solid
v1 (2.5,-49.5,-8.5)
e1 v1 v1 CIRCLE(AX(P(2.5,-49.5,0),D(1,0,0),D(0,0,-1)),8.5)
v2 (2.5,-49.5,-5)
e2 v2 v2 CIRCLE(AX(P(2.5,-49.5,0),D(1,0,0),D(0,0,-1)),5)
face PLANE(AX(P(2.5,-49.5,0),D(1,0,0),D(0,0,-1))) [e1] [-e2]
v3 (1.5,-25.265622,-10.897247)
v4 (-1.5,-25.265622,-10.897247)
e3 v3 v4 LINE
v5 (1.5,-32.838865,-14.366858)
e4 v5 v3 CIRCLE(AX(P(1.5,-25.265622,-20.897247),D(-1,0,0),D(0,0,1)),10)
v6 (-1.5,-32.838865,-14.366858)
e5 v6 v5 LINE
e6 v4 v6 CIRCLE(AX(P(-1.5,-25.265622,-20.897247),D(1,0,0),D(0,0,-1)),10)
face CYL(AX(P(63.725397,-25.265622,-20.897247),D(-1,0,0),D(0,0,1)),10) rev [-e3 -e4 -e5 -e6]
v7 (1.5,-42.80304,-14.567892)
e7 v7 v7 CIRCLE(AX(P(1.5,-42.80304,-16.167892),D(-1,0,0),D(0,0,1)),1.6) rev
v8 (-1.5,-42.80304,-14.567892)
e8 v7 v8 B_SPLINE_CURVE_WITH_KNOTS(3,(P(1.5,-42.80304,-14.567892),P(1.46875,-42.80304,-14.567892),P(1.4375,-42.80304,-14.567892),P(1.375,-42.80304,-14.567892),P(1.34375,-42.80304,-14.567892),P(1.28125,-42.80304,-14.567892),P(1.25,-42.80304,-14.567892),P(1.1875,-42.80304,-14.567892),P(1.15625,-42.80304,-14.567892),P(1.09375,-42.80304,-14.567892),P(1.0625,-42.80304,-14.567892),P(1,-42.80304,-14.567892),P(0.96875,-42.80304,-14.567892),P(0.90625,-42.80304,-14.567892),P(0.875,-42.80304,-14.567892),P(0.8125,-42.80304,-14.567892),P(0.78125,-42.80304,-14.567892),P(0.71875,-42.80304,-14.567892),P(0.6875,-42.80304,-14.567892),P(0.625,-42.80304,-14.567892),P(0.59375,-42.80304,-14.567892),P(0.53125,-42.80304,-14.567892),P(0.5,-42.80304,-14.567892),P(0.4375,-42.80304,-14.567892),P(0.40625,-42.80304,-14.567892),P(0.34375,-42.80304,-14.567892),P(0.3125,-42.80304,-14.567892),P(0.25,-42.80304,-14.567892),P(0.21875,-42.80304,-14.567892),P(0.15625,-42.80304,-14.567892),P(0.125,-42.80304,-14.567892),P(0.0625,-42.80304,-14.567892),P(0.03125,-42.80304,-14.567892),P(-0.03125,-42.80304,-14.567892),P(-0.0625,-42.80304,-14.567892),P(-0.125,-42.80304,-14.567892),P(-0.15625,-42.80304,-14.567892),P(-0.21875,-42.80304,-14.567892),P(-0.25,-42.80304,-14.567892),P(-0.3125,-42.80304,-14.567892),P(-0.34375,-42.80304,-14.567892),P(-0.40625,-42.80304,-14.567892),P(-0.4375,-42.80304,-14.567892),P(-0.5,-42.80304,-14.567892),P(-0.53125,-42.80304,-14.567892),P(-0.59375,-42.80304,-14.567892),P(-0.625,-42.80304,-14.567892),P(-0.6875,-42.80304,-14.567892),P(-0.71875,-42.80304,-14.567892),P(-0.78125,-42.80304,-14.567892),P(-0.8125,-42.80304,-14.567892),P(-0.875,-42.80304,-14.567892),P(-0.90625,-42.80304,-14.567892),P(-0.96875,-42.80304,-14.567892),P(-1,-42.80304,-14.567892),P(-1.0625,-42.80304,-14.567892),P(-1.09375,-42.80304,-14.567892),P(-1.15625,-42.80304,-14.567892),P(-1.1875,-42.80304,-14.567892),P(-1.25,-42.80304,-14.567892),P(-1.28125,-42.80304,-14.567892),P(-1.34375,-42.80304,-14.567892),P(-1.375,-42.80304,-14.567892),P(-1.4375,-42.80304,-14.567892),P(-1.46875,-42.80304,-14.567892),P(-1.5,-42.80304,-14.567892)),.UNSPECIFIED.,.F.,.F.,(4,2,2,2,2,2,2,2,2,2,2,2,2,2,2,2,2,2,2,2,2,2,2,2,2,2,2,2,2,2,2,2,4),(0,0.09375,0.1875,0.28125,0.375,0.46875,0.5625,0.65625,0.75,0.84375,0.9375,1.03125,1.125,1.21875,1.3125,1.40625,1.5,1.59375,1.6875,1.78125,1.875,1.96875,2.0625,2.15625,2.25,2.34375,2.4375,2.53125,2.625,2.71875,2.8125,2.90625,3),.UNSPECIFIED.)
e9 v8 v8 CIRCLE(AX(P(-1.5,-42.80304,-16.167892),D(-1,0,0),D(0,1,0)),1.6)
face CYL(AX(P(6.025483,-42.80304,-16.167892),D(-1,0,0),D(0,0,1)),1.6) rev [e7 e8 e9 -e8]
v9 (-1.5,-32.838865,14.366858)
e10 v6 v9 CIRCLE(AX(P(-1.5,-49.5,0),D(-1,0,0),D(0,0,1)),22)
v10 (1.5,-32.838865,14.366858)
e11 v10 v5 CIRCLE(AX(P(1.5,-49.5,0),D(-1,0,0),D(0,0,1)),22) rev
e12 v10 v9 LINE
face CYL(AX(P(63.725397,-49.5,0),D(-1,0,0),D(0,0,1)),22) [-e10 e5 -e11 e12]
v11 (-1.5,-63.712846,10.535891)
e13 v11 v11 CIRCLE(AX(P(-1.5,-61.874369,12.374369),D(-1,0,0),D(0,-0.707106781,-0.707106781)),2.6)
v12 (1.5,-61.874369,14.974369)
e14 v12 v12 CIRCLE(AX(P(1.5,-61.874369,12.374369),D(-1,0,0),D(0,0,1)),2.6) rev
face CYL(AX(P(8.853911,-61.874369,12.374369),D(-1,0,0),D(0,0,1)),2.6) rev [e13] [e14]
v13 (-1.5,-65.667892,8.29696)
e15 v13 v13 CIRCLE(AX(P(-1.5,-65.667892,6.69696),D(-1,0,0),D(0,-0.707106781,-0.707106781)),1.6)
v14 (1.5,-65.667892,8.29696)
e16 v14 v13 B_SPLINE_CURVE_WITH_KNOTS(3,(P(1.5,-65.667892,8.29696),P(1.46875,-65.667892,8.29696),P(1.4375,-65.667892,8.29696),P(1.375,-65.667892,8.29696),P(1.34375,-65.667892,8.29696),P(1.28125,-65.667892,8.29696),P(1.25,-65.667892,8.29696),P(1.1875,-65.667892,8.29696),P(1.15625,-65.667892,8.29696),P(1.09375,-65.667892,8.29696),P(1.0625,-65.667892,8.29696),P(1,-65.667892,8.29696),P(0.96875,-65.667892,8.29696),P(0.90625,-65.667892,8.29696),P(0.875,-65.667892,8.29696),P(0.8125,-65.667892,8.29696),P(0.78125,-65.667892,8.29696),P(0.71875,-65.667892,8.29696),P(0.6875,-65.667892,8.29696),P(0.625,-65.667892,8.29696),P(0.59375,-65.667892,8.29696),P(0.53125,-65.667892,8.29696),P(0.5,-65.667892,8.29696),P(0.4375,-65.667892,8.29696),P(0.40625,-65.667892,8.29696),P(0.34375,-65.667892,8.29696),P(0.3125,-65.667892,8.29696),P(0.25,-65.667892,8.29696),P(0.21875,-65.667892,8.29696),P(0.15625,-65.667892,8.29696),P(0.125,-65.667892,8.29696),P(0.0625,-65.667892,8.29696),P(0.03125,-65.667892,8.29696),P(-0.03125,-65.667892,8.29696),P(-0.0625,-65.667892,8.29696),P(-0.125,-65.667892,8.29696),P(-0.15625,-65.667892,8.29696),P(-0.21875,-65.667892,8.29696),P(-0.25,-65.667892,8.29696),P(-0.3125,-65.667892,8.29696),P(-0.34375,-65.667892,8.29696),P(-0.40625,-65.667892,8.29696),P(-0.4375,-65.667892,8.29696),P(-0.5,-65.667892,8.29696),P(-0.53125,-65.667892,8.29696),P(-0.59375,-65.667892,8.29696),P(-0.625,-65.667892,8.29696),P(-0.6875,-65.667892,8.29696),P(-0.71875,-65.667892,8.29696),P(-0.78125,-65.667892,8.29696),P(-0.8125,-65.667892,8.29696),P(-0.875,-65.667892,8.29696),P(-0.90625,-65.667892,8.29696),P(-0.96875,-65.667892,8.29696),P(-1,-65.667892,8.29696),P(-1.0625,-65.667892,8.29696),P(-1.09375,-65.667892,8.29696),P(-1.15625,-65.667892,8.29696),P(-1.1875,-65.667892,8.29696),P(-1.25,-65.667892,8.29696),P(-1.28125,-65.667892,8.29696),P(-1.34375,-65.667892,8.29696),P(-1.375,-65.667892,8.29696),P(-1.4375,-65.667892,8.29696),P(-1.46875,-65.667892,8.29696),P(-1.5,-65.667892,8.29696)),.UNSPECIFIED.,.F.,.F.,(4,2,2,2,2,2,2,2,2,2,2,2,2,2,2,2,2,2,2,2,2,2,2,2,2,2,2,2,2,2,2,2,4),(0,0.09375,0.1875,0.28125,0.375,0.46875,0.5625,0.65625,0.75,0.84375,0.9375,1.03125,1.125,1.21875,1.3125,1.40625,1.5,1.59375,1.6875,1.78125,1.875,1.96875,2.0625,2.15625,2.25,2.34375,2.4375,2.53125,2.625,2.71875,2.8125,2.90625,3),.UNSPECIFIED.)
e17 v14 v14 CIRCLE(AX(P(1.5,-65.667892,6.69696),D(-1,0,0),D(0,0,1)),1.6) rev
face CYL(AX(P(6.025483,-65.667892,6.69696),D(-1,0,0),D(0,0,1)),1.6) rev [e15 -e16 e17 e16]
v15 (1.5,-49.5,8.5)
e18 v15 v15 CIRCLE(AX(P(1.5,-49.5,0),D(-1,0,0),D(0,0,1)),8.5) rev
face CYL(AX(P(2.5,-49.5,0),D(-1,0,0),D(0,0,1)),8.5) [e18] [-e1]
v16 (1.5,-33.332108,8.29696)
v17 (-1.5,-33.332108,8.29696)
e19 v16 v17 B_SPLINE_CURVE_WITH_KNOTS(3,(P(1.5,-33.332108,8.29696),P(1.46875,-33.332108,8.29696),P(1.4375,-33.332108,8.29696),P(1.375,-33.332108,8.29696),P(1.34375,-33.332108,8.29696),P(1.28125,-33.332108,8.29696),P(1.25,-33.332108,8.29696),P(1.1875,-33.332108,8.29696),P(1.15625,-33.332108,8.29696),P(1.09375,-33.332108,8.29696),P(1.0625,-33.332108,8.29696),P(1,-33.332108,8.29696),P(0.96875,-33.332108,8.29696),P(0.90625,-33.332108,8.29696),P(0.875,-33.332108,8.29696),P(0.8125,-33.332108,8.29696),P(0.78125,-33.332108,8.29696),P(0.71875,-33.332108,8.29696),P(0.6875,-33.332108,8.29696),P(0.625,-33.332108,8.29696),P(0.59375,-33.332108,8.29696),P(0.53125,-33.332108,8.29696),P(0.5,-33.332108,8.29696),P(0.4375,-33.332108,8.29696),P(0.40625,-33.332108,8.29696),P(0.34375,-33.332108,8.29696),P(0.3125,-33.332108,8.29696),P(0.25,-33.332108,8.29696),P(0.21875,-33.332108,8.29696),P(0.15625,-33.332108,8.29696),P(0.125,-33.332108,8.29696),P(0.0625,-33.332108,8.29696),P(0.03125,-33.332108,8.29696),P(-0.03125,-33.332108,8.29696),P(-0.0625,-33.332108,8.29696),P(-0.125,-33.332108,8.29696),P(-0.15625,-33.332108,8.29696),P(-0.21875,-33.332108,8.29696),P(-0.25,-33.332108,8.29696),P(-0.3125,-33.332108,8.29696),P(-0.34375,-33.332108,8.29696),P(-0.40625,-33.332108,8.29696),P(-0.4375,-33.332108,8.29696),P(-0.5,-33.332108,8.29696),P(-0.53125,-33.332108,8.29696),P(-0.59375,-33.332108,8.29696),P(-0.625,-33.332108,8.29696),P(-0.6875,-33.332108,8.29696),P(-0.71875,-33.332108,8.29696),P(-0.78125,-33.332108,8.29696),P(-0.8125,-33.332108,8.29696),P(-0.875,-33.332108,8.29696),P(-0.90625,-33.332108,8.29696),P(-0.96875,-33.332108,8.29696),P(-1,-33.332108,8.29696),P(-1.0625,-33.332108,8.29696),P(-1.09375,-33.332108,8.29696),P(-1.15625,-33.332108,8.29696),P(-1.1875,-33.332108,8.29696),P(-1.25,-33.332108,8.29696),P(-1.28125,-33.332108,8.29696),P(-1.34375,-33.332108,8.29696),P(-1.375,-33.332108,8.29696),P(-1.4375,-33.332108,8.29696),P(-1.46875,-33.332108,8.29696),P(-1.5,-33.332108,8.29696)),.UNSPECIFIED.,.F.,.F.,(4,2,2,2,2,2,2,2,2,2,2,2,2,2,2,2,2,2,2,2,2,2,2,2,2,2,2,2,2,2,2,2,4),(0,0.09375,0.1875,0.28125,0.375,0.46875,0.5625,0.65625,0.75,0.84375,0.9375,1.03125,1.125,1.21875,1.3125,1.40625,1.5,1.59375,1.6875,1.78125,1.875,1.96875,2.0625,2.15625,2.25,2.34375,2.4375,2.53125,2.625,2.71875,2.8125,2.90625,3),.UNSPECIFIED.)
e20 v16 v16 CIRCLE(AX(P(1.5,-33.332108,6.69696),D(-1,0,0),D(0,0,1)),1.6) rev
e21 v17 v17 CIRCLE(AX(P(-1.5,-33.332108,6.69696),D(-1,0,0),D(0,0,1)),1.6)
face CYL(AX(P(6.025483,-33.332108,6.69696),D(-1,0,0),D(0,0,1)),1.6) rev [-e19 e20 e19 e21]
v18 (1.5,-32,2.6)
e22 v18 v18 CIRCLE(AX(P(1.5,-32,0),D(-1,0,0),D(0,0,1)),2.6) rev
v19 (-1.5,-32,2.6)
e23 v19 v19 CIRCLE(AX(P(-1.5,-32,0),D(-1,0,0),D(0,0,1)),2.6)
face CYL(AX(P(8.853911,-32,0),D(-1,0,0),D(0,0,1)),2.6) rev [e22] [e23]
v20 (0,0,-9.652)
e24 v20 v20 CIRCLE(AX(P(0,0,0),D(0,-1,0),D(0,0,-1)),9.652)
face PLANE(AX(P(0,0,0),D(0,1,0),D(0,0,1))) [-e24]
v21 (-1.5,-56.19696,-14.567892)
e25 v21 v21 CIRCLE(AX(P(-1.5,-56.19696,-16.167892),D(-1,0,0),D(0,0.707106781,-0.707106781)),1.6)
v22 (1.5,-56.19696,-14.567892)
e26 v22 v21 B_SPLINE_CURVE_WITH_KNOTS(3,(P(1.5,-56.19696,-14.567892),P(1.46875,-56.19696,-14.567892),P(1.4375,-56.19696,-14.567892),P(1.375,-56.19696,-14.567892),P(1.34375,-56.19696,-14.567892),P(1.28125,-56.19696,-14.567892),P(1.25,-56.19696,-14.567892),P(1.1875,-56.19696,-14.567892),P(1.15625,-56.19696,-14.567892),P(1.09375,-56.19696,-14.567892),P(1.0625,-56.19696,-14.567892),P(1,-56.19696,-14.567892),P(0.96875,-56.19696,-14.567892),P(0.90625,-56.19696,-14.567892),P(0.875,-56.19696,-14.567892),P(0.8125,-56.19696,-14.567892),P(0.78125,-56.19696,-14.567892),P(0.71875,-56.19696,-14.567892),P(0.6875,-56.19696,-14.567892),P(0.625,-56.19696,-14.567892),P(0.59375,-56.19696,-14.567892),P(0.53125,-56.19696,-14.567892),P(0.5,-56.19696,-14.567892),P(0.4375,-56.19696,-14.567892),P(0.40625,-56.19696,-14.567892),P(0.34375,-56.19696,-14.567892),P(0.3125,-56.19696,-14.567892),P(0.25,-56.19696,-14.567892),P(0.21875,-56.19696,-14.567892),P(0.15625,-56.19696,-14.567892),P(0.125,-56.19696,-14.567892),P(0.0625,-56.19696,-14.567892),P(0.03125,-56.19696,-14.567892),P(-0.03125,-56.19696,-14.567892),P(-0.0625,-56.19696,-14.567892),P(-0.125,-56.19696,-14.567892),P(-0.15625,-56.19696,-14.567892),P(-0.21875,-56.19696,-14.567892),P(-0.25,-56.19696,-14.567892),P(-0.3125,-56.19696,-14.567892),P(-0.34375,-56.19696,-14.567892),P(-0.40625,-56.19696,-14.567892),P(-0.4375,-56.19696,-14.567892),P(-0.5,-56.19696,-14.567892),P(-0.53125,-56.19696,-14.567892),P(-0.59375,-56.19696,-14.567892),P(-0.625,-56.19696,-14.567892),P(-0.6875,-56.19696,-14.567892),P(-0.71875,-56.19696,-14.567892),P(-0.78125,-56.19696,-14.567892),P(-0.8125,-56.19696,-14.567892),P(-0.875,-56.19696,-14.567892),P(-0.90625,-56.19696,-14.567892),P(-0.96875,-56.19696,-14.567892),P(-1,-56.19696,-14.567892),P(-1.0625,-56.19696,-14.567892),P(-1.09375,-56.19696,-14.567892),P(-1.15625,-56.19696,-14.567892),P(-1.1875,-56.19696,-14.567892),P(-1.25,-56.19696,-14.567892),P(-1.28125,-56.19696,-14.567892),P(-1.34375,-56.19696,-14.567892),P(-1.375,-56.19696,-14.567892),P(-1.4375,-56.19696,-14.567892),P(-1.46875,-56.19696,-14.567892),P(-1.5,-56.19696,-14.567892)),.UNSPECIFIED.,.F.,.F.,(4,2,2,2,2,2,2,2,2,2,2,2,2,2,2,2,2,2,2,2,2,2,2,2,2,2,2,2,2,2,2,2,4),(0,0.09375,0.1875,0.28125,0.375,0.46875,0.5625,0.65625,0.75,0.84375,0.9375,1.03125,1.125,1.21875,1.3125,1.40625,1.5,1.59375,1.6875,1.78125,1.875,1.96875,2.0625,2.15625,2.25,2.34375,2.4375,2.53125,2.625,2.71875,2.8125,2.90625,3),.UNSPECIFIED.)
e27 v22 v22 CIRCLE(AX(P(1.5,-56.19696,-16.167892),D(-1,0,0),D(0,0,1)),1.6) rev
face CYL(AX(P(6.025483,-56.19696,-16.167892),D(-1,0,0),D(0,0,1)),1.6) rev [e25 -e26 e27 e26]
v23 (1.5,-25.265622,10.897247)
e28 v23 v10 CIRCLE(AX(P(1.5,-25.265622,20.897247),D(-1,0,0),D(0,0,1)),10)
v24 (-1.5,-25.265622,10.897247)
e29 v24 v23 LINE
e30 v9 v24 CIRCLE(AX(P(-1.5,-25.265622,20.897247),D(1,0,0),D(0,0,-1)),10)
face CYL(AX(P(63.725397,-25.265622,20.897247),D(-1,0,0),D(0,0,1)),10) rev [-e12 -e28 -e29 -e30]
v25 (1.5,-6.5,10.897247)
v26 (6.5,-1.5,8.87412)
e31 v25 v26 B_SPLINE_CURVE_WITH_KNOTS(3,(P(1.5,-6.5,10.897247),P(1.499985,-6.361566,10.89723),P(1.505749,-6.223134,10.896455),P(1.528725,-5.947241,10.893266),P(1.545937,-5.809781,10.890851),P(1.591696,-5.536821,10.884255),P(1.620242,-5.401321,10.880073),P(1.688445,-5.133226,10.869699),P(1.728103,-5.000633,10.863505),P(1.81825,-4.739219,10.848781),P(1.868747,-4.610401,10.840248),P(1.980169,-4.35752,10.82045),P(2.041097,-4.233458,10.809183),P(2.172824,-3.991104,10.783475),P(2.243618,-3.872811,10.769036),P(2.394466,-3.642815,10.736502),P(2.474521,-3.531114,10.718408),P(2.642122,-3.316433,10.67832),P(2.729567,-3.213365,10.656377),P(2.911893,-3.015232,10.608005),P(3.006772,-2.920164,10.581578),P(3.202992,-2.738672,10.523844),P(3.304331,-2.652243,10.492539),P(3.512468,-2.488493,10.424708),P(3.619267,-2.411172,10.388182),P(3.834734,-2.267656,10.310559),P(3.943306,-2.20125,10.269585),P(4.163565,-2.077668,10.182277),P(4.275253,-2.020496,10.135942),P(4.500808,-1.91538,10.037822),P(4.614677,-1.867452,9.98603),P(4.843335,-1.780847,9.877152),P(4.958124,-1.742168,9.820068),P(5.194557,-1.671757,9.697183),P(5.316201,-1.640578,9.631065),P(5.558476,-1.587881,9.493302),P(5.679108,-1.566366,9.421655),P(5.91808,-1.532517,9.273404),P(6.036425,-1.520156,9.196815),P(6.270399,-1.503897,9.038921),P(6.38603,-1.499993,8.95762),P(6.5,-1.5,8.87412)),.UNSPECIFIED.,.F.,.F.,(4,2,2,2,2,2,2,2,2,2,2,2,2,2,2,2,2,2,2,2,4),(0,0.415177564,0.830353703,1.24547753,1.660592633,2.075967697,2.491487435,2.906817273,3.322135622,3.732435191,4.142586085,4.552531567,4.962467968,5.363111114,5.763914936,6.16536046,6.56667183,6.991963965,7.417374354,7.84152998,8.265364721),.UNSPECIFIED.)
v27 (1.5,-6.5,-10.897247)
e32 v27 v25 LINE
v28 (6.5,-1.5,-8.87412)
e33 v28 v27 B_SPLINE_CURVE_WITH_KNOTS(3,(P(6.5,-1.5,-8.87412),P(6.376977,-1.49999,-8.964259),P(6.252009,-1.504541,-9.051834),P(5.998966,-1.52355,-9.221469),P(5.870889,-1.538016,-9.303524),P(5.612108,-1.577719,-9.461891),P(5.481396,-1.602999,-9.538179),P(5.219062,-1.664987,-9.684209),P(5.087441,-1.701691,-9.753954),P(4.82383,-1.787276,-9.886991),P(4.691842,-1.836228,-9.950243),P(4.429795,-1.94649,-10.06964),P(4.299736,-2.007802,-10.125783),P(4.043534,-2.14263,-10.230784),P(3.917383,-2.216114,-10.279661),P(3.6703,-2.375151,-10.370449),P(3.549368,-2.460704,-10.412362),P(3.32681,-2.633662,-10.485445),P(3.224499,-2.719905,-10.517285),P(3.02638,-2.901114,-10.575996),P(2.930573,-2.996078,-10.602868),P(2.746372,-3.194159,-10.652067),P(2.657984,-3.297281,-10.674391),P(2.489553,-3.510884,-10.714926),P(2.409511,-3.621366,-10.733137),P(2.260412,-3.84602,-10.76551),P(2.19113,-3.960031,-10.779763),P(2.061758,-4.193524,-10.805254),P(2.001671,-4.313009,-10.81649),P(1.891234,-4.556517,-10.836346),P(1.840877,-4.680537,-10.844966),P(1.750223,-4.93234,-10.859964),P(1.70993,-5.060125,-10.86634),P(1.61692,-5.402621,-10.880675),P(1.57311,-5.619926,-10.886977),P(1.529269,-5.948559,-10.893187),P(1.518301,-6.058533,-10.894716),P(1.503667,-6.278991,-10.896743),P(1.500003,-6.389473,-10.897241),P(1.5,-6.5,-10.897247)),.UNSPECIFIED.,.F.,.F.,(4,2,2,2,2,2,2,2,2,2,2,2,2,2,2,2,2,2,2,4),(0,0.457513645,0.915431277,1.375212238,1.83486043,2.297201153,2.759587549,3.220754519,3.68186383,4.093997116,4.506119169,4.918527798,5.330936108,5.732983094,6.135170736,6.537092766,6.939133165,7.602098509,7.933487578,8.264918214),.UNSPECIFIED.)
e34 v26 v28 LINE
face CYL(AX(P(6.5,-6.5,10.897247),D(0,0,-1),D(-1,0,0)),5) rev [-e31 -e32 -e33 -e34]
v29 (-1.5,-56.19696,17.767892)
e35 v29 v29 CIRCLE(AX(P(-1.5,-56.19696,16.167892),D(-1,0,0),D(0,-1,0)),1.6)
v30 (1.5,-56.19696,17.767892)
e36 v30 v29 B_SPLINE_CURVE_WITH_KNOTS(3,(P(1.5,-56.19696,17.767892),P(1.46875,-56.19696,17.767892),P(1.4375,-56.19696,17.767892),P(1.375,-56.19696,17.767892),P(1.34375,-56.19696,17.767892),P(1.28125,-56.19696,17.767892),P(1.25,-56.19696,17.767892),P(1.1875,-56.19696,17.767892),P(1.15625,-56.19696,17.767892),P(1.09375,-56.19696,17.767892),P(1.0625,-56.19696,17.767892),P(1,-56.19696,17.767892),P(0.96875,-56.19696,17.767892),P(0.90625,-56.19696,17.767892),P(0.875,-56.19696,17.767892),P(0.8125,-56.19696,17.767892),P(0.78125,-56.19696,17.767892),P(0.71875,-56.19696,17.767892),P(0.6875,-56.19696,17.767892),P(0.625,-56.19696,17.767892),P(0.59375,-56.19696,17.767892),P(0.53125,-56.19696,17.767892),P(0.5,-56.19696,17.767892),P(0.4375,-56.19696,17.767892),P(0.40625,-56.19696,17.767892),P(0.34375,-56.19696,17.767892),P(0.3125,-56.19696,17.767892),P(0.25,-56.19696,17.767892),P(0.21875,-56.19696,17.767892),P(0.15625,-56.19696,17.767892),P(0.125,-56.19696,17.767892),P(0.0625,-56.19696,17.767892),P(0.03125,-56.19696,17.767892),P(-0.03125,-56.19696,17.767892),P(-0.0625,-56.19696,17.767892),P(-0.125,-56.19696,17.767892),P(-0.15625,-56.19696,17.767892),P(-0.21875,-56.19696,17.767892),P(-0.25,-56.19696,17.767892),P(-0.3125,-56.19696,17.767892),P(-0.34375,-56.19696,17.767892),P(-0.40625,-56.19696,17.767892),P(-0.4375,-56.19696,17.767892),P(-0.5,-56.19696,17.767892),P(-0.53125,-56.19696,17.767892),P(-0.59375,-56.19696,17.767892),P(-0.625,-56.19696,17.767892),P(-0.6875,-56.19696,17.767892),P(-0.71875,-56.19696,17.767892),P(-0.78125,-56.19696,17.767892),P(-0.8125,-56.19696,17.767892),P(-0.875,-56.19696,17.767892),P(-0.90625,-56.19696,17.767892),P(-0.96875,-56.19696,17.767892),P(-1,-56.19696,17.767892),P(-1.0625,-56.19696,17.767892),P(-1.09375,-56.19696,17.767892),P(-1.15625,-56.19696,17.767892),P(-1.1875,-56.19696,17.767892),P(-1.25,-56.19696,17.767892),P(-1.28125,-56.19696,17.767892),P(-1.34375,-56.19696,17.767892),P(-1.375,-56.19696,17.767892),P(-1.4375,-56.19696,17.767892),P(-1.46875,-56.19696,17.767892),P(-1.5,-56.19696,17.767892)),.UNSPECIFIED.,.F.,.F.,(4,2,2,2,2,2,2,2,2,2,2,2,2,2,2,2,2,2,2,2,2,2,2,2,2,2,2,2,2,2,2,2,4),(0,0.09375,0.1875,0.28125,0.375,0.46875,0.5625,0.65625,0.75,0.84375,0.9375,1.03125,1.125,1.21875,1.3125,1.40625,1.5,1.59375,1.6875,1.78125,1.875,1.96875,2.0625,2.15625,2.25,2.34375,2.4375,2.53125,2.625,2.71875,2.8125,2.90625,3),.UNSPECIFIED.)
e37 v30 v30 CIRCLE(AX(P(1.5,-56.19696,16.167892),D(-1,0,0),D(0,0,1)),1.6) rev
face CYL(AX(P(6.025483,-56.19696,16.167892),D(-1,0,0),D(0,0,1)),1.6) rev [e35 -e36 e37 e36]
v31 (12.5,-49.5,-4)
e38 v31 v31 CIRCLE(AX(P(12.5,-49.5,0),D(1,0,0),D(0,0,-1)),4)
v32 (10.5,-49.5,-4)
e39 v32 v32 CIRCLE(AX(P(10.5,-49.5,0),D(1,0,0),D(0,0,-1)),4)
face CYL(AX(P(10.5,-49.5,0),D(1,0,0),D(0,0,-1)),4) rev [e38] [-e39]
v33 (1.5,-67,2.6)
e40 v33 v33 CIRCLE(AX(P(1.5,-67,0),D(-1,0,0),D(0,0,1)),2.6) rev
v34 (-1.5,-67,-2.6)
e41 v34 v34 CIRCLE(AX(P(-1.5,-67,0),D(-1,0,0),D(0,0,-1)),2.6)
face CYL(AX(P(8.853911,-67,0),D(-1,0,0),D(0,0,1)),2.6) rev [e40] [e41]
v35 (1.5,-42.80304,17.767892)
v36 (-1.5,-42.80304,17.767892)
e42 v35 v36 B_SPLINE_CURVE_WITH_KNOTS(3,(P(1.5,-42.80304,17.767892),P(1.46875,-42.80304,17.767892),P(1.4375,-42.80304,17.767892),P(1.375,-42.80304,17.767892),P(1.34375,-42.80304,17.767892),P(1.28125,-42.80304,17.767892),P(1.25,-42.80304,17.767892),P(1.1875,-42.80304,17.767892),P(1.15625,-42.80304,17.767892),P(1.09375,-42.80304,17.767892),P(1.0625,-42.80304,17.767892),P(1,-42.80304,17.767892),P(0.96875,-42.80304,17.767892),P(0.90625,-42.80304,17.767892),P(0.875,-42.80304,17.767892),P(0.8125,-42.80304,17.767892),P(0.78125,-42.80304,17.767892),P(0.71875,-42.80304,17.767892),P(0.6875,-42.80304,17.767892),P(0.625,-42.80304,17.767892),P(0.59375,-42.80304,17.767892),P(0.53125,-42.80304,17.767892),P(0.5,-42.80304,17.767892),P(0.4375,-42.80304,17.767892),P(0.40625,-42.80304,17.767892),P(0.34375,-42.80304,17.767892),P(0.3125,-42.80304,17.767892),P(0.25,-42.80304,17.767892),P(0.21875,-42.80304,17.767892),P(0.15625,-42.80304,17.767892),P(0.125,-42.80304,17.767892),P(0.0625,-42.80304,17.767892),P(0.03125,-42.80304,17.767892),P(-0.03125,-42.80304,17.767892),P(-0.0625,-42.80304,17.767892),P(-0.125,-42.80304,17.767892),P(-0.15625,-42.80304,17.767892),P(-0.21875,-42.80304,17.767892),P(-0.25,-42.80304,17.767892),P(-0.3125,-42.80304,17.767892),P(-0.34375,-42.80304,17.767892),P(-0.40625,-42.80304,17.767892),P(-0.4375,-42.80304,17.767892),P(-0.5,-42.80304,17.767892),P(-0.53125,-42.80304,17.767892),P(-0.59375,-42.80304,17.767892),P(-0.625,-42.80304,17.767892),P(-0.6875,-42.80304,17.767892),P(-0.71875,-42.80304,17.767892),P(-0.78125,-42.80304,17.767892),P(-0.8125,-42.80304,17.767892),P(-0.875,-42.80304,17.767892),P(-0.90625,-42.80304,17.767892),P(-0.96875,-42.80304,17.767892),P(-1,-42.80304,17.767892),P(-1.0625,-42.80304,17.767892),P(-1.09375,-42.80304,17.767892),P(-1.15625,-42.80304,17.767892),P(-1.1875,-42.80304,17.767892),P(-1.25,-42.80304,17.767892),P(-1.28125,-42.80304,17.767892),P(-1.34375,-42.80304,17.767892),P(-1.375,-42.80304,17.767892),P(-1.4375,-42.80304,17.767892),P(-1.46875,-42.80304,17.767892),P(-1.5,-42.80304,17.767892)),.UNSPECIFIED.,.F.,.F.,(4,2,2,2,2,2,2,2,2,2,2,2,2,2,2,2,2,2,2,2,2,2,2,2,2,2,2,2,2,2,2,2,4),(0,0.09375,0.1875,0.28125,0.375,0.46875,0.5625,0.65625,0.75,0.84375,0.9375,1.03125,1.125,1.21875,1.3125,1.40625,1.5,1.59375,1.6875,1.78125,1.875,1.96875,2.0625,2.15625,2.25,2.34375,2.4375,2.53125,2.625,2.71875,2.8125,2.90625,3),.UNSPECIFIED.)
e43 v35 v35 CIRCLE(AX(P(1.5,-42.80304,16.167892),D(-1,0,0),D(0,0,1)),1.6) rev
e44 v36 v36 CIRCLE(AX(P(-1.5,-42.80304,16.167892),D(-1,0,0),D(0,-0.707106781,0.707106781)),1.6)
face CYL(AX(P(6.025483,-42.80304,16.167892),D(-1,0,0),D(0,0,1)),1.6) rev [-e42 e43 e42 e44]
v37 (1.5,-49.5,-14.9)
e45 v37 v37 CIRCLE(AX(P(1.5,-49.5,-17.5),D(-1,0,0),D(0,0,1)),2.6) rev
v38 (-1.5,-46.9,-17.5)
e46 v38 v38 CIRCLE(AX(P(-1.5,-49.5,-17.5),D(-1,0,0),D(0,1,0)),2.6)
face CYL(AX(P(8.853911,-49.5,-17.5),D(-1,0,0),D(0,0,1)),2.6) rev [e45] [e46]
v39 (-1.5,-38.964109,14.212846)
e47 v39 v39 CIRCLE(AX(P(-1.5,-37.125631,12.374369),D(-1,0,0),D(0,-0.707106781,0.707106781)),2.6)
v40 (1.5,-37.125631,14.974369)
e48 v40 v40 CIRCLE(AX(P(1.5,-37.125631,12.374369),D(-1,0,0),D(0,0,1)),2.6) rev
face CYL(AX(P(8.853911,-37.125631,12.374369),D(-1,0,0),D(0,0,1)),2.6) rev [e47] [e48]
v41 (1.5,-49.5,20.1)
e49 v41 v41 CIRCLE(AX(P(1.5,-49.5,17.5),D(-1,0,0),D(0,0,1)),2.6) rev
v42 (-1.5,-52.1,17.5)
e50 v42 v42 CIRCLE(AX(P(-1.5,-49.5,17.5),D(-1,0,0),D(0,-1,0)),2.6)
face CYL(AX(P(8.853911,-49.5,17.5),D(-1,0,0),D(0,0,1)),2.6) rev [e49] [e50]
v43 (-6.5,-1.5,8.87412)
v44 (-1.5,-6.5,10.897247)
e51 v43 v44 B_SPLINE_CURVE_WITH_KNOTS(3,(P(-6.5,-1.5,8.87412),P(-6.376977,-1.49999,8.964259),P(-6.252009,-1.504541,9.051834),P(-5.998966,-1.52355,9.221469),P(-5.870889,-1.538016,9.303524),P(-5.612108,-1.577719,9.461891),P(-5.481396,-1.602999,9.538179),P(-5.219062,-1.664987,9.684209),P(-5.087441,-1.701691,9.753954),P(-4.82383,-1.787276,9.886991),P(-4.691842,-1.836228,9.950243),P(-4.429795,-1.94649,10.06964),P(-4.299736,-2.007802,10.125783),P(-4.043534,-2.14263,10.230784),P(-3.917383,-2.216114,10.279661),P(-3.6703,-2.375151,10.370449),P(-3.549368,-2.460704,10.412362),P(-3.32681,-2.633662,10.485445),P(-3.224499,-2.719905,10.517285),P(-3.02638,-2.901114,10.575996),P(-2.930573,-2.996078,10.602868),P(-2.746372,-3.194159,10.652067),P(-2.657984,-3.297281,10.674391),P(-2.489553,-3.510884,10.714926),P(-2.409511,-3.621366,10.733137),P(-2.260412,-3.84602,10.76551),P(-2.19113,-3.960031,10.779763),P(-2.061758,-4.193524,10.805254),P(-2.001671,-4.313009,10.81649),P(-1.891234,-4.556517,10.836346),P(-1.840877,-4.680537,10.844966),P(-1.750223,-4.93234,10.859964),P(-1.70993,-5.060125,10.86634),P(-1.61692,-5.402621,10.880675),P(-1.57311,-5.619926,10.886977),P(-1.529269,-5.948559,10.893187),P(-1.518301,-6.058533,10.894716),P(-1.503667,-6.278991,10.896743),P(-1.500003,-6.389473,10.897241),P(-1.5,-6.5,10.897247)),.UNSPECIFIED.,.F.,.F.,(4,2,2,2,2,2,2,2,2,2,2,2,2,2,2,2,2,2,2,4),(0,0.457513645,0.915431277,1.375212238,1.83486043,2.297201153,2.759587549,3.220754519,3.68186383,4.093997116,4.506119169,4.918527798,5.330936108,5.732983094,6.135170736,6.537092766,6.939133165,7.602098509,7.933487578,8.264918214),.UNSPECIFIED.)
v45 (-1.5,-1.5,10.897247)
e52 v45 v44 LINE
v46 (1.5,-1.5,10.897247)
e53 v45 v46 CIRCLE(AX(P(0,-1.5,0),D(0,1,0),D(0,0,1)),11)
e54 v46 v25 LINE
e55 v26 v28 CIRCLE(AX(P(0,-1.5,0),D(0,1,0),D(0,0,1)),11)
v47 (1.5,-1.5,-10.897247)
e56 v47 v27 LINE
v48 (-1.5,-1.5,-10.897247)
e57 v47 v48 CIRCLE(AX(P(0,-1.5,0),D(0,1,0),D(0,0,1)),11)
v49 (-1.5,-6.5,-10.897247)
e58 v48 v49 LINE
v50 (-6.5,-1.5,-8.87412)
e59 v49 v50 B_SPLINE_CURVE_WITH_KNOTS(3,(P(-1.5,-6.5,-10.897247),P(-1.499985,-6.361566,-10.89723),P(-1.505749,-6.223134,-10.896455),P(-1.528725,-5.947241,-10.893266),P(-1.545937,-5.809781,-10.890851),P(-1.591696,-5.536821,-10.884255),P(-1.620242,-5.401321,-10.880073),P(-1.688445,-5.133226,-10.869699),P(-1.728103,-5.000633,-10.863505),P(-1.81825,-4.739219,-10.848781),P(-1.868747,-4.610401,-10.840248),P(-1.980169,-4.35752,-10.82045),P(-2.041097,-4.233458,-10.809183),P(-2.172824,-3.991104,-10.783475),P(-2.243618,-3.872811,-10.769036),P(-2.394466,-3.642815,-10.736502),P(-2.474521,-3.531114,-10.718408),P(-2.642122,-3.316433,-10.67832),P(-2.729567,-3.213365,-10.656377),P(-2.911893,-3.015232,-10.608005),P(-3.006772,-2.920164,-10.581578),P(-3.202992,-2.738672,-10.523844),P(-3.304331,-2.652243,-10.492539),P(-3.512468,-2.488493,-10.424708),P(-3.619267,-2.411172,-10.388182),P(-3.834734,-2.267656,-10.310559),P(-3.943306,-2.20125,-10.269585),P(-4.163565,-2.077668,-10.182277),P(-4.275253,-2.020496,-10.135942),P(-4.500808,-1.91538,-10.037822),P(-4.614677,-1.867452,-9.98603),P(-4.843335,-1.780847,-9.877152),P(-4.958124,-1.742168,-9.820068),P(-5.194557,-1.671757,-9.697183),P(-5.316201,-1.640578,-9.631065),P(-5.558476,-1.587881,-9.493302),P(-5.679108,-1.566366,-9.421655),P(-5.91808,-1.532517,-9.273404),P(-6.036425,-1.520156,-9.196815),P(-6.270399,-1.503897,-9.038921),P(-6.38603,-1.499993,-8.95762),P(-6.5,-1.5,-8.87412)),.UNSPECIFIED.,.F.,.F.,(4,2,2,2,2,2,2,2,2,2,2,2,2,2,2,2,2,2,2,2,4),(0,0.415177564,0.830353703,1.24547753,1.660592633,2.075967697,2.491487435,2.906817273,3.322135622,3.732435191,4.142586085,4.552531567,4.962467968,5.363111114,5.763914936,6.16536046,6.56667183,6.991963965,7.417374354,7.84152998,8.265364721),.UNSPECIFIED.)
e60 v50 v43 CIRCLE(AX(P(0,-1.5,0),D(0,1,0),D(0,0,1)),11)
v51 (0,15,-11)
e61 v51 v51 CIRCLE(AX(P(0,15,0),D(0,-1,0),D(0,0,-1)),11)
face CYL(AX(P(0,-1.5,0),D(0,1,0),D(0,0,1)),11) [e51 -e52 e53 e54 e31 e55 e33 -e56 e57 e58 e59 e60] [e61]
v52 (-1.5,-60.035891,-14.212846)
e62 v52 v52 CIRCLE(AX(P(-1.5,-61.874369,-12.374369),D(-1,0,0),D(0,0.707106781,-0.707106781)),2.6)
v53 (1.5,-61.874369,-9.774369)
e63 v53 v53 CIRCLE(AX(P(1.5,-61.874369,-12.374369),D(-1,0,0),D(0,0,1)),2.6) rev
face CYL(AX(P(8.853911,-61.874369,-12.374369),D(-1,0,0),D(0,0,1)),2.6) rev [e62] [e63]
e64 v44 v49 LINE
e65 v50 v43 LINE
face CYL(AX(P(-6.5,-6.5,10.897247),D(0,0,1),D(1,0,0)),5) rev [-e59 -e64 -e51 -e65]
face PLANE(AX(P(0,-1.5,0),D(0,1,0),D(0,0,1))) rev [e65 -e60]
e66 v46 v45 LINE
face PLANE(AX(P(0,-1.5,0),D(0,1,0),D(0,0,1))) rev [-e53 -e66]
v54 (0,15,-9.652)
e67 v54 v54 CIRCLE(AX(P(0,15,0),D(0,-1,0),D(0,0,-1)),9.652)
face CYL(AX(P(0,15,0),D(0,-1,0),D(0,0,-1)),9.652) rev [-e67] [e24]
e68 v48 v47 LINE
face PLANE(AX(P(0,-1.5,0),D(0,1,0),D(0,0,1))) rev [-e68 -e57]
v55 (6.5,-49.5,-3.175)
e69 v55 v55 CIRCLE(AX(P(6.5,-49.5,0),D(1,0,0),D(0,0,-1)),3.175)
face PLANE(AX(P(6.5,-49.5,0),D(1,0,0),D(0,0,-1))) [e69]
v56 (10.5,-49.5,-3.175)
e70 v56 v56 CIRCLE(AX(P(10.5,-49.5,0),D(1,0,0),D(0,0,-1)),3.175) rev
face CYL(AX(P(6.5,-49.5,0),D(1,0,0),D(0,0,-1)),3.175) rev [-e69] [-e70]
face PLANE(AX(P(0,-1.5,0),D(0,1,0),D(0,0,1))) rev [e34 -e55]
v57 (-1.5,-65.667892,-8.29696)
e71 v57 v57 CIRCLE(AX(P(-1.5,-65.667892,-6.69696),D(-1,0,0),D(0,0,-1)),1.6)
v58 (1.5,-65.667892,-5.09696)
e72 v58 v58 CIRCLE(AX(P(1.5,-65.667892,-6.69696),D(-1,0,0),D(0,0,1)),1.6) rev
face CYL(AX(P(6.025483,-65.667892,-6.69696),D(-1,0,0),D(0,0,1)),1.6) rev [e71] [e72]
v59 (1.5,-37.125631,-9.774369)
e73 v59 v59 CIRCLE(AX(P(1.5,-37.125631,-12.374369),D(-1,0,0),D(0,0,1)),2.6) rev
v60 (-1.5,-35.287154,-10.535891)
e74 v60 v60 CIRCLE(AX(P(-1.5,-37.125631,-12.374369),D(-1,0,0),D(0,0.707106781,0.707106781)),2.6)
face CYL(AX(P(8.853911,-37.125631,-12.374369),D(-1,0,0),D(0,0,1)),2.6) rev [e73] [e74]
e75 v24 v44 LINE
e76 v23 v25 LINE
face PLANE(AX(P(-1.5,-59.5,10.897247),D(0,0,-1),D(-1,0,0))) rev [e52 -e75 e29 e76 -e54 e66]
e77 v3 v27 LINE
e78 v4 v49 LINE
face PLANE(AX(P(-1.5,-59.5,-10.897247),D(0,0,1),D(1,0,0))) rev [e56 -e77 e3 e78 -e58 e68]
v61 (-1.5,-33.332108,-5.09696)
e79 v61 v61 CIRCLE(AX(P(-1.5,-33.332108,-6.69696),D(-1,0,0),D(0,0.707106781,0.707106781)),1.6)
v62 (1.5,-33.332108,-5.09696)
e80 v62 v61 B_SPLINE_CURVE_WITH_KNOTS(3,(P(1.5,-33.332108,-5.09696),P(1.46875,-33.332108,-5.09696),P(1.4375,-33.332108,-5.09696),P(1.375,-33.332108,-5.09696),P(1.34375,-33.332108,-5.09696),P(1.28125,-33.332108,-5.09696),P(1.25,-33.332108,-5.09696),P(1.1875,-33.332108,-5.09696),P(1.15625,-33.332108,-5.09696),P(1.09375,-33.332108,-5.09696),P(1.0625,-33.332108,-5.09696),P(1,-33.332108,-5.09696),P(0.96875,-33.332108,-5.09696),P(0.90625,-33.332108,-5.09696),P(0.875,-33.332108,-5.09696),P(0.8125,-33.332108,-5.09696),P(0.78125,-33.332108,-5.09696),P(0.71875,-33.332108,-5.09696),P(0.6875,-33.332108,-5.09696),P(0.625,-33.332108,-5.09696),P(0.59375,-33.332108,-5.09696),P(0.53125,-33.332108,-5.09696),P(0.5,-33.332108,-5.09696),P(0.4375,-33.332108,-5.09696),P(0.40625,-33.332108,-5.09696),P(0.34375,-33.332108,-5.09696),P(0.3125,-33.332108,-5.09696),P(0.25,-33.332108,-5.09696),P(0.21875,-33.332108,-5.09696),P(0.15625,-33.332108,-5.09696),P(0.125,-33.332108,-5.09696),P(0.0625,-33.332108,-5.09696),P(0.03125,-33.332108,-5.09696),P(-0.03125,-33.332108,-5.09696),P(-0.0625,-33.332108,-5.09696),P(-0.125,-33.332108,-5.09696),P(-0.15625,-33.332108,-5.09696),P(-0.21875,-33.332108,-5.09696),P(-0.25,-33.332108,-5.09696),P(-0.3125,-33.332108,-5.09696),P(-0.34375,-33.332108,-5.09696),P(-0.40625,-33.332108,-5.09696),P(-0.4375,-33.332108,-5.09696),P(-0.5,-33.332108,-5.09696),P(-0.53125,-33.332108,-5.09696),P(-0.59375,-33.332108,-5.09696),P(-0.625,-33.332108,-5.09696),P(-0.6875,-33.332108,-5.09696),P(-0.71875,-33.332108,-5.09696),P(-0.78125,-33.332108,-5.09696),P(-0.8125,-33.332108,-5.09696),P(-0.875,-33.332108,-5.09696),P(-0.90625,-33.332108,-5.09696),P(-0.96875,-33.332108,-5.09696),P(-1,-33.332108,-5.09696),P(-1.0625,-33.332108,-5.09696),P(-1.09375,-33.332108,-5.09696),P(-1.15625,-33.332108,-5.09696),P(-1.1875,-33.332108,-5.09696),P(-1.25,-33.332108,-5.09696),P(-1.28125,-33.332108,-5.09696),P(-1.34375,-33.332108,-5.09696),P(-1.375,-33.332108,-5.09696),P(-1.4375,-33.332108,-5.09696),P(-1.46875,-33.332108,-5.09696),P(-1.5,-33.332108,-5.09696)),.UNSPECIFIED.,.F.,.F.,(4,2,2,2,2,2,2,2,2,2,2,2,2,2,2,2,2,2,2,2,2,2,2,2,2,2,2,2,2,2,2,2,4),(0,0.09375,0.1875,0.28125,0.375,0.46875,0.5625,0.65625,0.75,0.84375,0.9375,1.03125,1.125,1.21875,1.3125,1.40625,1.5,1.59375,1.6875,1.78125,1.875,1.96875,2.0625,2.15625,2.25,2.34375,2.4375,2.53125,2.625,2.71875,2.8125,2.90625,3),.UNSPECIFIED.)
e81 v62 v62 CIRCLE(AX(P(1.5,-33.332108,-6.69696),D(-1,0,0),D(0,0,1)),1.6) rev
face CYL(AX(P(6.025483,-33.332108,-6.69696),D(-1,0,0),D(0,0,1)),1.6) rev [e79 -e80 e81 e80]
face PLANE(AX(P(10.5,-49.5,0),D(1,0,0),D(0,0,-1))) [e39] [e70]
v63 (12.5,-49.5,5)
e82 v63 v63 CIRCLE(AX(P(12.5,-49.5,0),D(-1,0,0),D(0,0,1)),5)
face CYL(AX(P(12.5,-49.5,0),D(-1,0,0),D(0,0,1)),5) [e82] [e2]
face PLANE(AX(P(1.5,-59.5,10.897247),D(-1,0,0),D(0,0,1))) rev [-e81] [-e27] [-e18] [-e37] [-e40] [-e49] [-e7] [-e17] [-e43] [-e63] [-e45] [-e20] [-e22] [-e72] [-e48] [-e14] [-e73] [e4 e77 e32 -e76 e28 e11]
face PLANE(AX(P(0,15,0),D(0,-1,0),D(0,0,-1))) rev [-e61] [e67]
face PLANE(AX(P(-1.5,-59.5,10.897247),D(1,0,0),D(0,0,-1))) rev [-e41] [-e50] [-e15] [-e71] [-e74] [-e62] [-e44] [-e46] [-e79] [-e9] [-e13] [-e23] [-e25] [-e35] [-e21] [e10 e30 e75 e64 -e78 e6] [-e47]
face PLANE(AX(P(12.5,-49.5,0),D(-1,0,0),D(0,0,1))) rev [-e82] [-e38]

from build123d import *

# Parameters (mm, degrees)
SKETCH2_R            = 11
BOSS_EXTRUDE2_DEPTH  = 1.5
BOSS_EXTRUDE3_START  = -15
SKETCH3_R            = 11
SKETCH3_R_2          = 9.652
BOSS_EXTRUDE3_DEPTH  = 15
SKETCH4_W            = 3
SKETCH4_H            = 21.794494718
BOSS_EXTRUDE4_DEPTH  = 58
SKETCH11_R           = 8.5
BOSS_EXTRUDE11_DEPTH = 1
SKETCH8_R            = 5
BOSS_EXTRUDE6_DEPTH  = 10
SKETCH15_R           = 3.175
ENCODER_BED_DEPTH    = 6
FILLET5_R            = 10
FILLET7_R            = 5
SKETCH21_R           = 4
CUT_EXTRUDE6_DEPTH   = 2
SKETCH22_R           = 22
BOSS_EXTRUDE13_DEPTH = 3
SKETCH23_R           = 2.6
CUT_EXTRUDE7_DEPTH   = 3
CIRPATTERN1_COUNT    = 8
SKETCH24_R           = 1.6
CUT_EXTRUDE8_DEPTH   = 3
CIRPATTERN2_COUNT    = 8
FILLET8_R            = 10


with BuildPart() as part:
    # Sketch2 → Boss-Extrude2 (new body)
    with BuildSketch(Plane(origin=(0, 0, 0), x_dir=(-1, 0, 0), z_dir=(0, 1, 0))):
        with Locations(Location((0, 0, 0), (0, 0, 90))):
            Circle(SKETCH2_R)
    extrude(amount=-BOSS_EXTRUDE2_DEPTH)

    # Sketch3 → Boss-Extrude3 (add)
    with BuildSketch(Plane(origin=(0, 0, 0), x_dir=(-1, 0, 0), z_dir=(0, -1, 0)).offset(BOSS_EXTRUDE3_START)):
        with Locations(Location((0, 0, 0), (0, 0, 270))):
            Circle(SKETCH3_R)
        with Locations(Location((0, 0, 0), (0, 0, 90))):
            Circle(SKETCH3_R_2, mode=Mode.SUBTRACT)
    extrude(amount=BOSS_EXTRUDE3_DEPTH)

    # Sketch4 → Boss-Extrude4 (add)
    with BuildSketch(Plane.XZ.offset(1.5)):
        Rectangle(SKETCH4_W, SKETCH4_H)
    extrude(amount=BOSS_EXTRUDE4_DEPTH)

    # Sketch11 → Boss-Extrude11 (add)
    with BuildSketch(Plane(origin=(1.5, 0, 0), x_dir=(0, 0, -1), z_dir=(1, 0, 0))):
        with Locations(Location((0, -49.5, 0), (0, 0, 180))):
            Circle(SKETCH11_R)
    extrude(amount=BOSS_EXTRUDE11_DEPTH)

    # Sketch8 → Boss-Extrude6 (add)
    with BuildSketch(Plane.ZY.offset(-2.5)):
        with Locations((0, -49.5)):
            Circle(SKETCH8_R)
    extrude(amount=-BOSS_EXTRUDE6_DEPTH)

    # Sketch15 → encoder_bed (cut)
    with BuildSketch(Plane(origin=(12.5, 0, 0), x_dir=(0, 0, -1), z_dir=(1, 0, 0))):
        with Locations((0, -49.5)):
            Circle(SKETCH15_R)
    extrude(amount=-ENCODER_BED_DEPTH, mode=Mode.SUBTRACT)

    # Fillet5
    fillet5_edges = [part.edges().sort_by_distance(p)[0] for p in [
        (0, -59.5, 10.897247359),
        (0, -59.5, -10.897247359),
    ]]
    fillet(fillet5_edges, radius=FILLET5_R)

    # Fillet7
    # the kernel refuses this fillet: 5 mm, written as the material it adds along each edge
    with BuildSketch(Plane(origin=(1.5, -1.5, 10.897247359), x_dir=(0, -1, 0), z_dir=(0, 0, -1))) as fillet7_piece_1_section:
        with BuildLine():
            CenterArc((FILLET7_R, -FILLET7_R), FILLET7_R, 90, 90)
            Line((0, -FILLET7_R), (0, 0))
            Line((0, 0), (FILLET7_R, 0))
        make_face()
    fillet7_piece_1 = extrude(amount=21.794494718, mode=Mode.PRIVATE)
    fillet7_piece_1 = fillet7_piece_1 & Plane(origin=(0, -2.650343277, 0), x_dir=(0, 0, 1), z_dir=(0, 1, 0)) * Cylinder(11, 64, mode=Mode.PRIVATE)
    add(fillet7_piece_1)
    with BuildSketch(Plane(origin=(-1.5, -1.5, -10.897247359), x_dir=(0, -1, 0), z_dir=(0, 0, 1))) as fillet7_piece_2_section:
        with BuildLine():
            CenterArc((FILLET7_R, -FILLET7_R), FILLET7_R, 90, 90)
            Line((0, -FILLET7_R), (0, 0))
            Line((0, 0), (FILLET7_R, 0))
        make_face()
    fillet7_piece_2 = extrude(amount=21.794494718, mode=Mode.PRIVATE)
    fillet7_piece_2 = fillet7_piece_2 & Plane(origin=(0, -2.650343277, 0), x_dir=(0, 0, 1), z_dir=(0, 1, 0)) * Cylinder(11, 64, mode=Mode.PRIVATE)
    add(fillet7_piece_2)

    # Sketch21 → Cut-Extrude6 (cut)
    with BuildSketch(Plane(origin=(12.5, 0, 0), x_dir=(0, 0, -1), z_dir=(1, 0, 0))):
        with Locations((0, -49.5)):
            Circle(SKETCH21_R)
    extrude(amount=-CUT_EXTRUDE6_DEPTH, mode=Mode.SUBTRACT)

    # Sketch22 → Boss-Extrude13 (add)
    with BuildSketch(Plane.ZY.offset(1.5)):
        with Locations((0, -49.5)):
            Circle(SKETCH22_R)
    extrude(amount=-BOSS_EXTRUDE13_DEPTH)

    # Sketch23 → Cut-Extrude7 (cut)
    with BuildSketch(Plane.ZY.offset(1.5)):
        with Locations((0, -32)):
            Circle(SKETCH23_R)
    cut_extrude7 = extrude(amount=-CUT_EXTRUDE7_DEPTH, mode=Mode.SUBTRACT)

    # CirPattern1: Cut-Extrude7 ×8 about axis
    cirpattern1_axis = Axis((0, -49.5, 0), (1, 0, 0))
    for i in range(1, CIRPATTERN1_COUNT):
        add(cut_extrude7.rotate(cirpattern1_axis, i * 360 / CIRPATTERN1_COUNT), mode=Mode.SUBTRACT)

    # Sketch24 → Cut-Extrude8 (cut)
    with BuildSketch(Plane.ZY.offset(1.5)):
        with Locations((6.696960066, -33.332108181)):
            Circle(SKETCH24_R)
    cut_extrude8 = extrude(amount=-CUT_EXTRUDE8_DEPTH, mode=Mode.SUBTRACT)

    # CirPattern2: Cut-Extrude8 ×8 about axis
    cirpattern2_axis = Axis((0, -49.5, 0), (1, 0, 0))
    for i in range(1, CIRPATTERN2_COUNT):
        add(cut_extrude8.rotate(cirpattern2_axis, i * 360 / CIRPATTERN2_COUNT), mode=Mode.SUBTRACT)

    # Fillet8
    fillet8_edges = [part.edges().sort_by_distance(p)[0] for p in [
        (0, -30.388485146, -10.897247359),
        (0, -30.388485146, 10.897247359),
    ]]
    fillet(fillet8_edges, radius=FILLET8_R)


solid = part.part
